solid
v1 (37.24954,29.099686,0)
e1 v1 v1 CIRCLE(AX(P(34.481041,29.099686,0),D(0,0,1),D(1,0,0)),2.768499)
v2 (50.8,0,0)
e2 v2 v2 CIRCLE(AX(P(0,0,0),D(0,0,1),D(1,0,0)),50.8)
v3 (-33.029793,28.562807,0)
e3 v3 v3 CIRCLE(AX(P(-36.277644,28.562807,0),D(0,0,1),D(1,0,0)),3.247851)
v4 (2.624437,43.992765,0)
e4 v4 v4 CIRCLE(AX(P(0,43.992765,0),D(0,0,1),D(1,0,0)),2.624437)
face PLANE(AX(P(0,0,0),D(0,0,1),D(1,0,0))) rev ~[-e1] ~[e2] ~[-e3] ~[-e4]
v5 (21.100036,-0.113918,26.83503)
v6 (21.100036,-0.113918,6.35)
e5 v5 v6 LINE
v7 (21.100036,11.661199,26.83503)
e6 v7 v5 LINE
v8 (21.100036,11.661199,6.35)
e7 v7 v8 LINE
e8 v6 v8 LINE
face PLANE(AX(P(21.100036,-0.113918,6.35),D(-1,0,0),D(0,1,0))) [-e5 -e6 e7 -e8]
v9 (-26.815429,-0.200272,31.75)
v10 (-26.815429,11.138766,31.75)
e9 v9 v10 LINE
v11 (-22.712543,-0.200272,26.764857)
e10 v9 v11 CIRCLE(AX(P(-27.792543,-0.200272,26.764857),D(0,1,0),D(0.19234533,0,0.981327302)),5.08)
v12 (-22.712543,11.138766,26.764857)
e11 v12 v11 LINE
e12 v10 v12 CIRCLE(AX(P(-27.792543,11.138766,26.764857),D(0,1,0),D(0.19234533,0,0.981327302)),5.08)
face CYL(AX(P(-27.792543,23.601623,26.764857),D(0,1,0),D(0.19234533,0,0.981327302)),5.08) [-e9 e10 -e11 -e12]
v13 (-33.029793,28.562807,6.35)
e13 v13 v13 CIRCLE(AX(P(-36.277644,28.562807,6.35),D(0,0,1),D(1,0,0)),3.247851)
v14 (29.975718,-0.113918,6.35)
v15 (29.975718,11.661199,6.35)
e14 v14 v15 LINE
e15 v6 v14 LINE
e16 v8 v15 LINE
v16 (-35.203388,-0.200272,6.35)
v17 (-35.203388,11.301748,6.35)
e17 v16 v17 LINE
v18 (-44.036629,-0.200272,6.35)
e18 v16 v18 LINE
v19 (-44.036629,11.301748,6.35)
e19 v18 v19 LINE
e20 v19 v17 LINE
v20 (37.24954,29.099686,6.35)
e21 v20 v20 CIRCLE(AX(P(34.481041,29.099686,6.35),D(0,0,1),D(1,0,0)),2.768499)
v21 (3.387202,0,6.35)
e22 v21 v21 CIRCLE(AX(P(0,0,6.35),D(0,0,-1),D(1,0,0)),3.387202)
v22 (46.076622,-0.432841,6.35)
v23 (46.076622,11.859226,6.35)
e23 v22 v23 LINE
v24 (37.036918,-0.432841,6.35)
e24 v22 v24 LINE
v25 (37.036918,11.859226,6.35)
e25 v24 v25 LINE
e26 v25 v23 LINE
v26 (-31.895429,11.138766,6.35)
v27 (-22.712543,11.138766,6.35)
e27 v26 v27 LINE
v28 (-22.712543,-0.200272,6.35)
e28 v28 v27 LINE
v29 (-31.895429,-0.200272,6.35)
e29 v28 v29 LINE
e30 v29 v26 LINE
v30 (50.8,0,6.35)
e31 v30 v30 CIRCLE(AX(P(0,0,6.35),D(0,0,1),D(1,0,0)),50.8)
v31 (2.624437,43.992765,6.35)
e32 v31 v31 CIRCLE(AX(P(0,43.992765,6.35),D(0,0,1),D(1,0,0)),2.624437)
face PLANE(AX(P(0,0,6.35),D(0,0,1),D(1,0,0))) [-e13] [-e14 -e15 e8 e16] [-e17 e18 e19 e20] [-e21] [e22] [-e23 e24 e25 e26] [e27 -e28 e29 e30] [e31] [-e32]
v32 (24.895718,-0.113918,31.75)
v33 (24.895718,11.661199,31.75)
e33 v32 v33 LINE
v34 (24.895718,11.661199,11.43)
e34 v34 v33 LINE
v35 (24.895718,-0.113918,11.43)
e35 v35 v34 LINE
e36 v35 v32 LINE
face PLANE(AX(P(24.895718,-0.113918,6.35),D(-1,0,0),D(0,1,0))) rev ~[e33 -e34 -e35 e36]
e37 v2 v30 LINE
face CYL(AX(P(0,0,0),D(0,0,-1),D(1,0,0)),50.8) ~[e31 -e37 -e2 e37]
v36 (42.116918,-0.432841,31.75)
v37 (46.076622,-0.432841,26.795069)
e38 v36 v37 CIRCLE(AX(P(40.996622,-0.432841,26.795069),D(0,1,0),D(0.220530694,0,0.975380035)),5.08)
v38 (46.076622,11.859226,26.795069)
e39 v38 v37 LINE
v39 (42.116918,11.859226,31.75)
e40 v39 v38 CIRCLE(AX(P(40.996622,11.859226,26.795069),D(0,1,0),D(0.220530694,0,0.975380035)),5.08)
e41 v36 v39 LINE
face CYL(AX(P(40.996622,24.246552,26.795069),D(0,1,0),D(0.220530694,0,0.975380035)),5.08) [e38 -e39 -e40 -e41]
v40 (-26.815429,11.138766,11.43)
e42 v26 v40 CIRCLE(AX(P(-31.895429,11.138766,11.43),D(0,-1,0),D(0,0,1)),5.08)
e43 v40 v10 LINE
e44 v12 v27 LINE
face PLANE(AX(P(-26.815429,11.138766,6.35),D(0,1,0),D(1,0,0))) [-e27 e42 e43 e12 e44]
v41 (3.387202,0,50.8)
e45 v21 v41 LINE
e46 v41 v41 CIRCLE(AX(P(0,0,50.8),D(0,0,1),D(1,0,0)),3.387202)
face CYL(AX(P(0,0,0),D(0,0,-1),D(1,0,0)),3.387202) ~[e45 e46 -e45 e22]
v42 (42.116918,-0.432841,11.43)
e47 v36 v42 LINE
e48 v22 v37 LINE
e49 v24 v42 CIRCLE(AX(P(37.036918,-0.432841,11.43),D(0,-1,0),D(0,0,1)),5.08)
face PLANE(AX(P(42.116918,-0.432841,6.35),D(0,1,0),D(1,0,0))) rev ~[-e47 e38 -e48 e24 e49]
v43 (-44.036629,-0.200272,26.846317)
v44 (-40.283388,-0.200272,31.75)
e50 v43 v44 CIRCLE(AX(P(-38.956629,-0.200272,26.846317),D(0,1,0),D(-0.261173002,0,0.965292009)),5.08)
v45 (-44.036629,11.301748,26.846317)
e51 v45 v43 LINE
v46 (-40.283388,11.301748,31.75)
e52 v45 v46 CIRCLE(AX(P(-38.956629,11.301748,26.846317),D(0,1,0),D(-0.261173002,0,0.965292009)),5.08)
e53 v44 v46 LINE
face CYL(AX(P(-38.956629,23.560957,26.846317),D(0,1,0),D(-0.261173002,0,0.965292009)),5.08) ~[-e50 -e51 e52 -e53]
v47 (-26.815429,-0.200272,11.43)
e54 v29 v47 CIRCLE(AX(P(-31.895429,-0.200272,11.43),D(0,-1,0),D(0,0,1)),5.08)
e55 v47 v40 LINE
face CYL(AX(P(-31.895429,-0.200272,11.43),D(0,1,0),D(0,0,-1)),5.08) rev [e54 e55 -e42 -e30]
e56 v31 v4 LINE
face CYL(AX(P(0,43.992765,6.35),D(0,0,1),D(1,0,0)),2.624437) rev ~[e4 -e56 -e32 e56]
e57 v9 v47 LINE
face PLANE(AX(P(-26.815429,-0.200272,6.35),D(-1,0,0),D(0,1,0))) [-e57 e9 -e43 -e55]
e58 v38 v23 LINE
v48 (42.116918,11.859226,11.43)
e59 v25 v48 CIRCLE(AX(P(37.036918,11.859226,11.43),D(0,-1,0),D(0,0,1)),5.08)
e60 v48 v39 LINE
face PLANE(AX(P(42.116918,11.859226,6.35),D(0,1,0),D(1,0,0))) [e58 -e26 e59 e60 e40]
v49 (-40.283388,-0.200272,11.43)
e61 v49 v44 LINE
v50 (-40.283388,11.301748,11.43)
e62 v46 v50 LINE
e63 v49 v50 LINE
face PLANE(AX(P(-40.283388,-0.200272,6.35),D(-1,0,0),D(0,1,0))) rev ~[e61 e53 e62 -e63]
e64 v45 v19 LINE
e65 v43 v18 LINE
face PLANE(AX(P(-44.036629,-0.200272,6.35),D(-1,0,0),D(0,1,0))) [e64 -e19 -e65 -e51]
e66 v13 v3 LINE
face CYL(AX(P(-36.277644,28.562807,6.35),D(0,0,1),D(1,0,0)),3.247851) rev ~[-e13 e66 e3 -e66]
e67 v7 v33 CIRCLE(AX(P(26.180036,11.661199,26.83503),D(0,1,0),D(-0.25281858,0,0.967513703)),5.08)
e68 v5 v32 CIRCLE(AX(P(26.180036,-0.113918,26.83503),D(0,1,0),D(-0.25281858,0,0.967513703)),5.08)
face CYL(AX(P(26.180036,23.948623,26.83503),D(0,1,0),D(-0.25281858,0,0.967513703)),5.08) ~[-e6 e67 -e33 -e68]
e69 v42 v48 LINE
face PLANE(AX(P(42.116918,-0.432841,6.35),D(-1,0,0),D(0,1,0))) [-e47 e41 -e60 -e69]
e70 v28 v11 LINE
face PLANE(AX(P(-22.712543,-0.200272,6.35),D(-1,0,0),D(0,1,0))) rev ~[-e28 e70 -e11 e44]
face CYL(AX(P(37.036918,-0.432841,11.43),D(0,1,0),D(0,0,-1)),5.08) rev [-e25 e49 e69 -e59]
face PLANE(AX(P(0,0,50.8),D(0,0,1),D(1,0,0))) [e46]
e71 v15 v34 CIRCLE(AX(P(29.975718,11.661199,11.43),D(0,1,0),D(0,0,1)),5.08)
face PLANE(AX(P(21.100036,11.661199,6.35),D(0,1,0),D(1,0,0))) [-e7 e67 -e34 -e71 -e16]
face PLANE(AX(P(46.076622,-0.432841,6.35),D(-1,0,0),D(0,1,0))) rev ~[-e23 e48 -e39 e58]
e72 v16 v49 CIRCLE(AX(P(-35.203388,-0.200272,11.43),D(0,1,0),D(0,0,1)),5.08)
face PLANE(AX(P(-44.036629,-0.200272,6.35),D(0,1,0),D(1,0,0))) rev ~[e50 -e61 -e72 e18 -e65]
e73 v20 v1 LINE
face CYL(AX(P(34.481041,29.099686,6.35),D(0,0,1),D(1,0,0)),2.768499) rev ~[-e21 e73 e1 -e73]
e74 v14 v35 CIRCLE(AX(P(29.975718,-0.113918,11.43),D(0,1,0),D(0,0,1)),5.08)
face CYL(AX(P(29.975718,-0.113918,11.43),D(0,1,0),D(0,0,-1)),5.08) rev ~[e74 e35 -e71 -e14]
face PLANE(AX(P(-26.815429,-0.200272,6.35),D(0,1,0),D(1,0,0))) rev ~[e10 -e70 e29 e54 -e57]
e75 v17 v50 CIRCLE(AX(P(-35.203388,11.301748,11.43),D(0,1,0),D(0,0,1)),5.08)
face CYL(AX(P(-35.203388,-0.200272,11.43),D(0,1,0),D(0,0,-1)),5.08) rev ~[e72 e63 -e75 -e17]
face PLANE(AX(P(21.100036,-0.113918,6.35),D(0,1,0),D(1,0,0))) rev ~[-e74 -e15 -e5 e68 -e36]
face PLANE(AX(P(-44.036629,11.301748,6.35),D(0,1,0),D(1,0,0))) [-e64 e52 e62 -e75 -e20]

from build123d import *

# Parameters (mm, degrees)
F0_R        = 50.8
F1_DEPTH    = 6.35
F2_R        = 3.3872020891
F3_DEPTH    = 50.8
F4_W        = 3.7956816162
F4_H        = 11.7751168936
F4_W_2      = 3.9597040755
F4_H_2      = 12.2920670431
F4_W_3      = 3.7532411516
F4_H_3      = 11.5020200028
F4_W_4      = 4.1028857231
F4_H_4      = 11.3390376209
F5_DEPTH    = 17.78
F6_R        = 5.08
F7_DEPTH    = 25.4
F8_T1_DEPTH = 36.0204370388
F8_T3_DEPTH = 36.2647510961
F8_T5_DEPTH = 36.3499649547
F8_T7_DEPTH = 37.0667199375
F9_R        = 2.6244366773
F9_R_2      = 2.7684987857
F9_R_3      = 3.2478511369
F10_DEPTH   = 25.4


# Not quite as in the source:
# - a fillet or chamfer that OpenCascade refuses, or shapes differently, is made with other operations: its cross-section is extruded or revolved along the edge and cut away or added


with BuildPart() as f1:
    # F0 (on Top) → F1 (new body)
    with BuildSketch(Plane.XY):
        Circle(F0_R)
    extrude(amount=F1_DEPTH)

    # F2 (on Top) → F3 (join)
    with BuildSketch(Plane.XY):
        Circle(F2_R)
    extrude(amount=F3_DEPTH)

    # F4 (on face) → F5 (join)
    with BuildSketch(Plane.XY.offset(6.35)):
        with Locations((22.9978772923, 5.7736401254)):
            Rectangle(F4_W, F4_H)
        with Locations((44.0967701382, 5.7131922383)):
            Rectangle(F4_W_2, F4_H_2)
        with Locations((-42.1600081027, 5.5507384532)):
            Rectangle(F4_W_3, F4_H_3)
        with Locations((-24.7639858169, 5.4692472622)):
            Rectangle(F4_W_4, F4_H_4)
    extrude(amount=F5_DEPTH)

    # F6
    f6_edges = [f1.edges().sort_by_distance(p)[0] for p in [
        (24.895718, 5.77364, 6.35),
        (42.116918, 5.713192, 6.35),
        (-40.283388, 5.550738, 6.35),
        (-26.815429, 5.469247, 6.35),
    ]]
    fillet(f6_edges, radius=F6_R)

    # F4 (on face) → F7 (join)
    with BuildSketch(Plane.XY.offset(6.35)):
        with Locations((22.9978772923, 5.7736401254)):
            Rectangle(F4_W, F4_H)
        with Locations((44.0967701382, 5.7131922383)):
            Rectangle(F4_W_2, F4_H_2)
        with Locations((-42.1600081027, 5.5507384532)):
            Rectangle(F4_W_3, F4_H_3)
        with Locations((-24.7639858169, 5.4692472622)):
            Rectangle(F4_W_4, F4_H_4)
    extrude(amount=F7_DEPTH)

    # F8: fillet of radius 5.08 on 4 edges, made by hand

    # F8_s2 → F8_t1 (cut)
    with BuildSketch(Plane.XZ.offset(-23.5609569726)):
        with BuildLine():
            ThreePointArc((-40.2833875269, 31.75), (-42.9906301007, 29.9339099153), (-44.0366286784, 26.8463165928))
            Line((-44.0366286784, 26.8463165928), (-44.0366286784, 31.75))
            Line((-44.0366286784, 31.75), (-40.2833875269, 31.75))
        make_face()
    extrude(amount=F8_T1_DEPTH, mode=Mode.SUBTRACT)

    # F8_s4 → F8_t3 (cut)
    with BuildSketch(Plane.XZ.offset(-23.6016228103)):
        with BuildLine():
            ThreePointArc((-26.8154286784, 31.75), (-23.8701622671, 29.9930657457), (-22.7125429553, 26.764857305))
            Line((-22.7125429553, 26.764857305), (-22.7125429553, 31.75))
            Line((-22.7125429553, 31.75), (-26.8154286784, 31.75))
        make_face()
    extrude(amount=F8_T3_DEPTH, mode=Mode.SUBTRACT)

    # F8_s6 → F8_t5 (cut)
    with BuildSketch(Plane.XZ.offset(-23.9486226027)):
        with BuildLine():
            ThreePointArc((24.8957181004, 31.75), (22.1594185349, 29.9400314031), (21.1000364843, 26.8350303878))
            Line((21.1000364843, 26.8350303878), (21.1000364843, 31.75))
            Line((21.1000364843, 31.75), (24.8957181004, 31.75))
        make_face()
    extrude(amount=F8_T5_DEPTH, mode=Mode.SUBTRACT)

    # F8_s8 → F8_t7 (cut)
    with BuildSketch(Plane.XZ.offset(-24.2465522071)):
        with BuildLine():
            ThreePointArc((42.1169181004, 31.75), (44.9650918619, 29.9664489871), (46.0766221759, 26.7950694211))
            Line((46.0766221759, 26.7950694211), (46.0766221759, 31.75))
            Line((46.0766221759, 31.75), (42.1169181004, 31.75))
        make_face()
    extrude(amount=F8_T7_DEPTH, mode=Mode.SUBTRACT)

    # F9 (on face) → F10 (cut)
    with BuildSketch(Plane.XY.offset(6.35)):
        with Locations((0, 43.9927652478)):
            Circle(F9_R)
        with Locations((34.4810411334, 29.0996860713)):
            Circle(F9_R_2)
        with Locations((-36.2776443362, 28.5628065467)):
            Circle(F9_R_3)
    extrude(amount=-F10_DEPTH, mode=Mode.SUBTRACT)


solid = f1.part
